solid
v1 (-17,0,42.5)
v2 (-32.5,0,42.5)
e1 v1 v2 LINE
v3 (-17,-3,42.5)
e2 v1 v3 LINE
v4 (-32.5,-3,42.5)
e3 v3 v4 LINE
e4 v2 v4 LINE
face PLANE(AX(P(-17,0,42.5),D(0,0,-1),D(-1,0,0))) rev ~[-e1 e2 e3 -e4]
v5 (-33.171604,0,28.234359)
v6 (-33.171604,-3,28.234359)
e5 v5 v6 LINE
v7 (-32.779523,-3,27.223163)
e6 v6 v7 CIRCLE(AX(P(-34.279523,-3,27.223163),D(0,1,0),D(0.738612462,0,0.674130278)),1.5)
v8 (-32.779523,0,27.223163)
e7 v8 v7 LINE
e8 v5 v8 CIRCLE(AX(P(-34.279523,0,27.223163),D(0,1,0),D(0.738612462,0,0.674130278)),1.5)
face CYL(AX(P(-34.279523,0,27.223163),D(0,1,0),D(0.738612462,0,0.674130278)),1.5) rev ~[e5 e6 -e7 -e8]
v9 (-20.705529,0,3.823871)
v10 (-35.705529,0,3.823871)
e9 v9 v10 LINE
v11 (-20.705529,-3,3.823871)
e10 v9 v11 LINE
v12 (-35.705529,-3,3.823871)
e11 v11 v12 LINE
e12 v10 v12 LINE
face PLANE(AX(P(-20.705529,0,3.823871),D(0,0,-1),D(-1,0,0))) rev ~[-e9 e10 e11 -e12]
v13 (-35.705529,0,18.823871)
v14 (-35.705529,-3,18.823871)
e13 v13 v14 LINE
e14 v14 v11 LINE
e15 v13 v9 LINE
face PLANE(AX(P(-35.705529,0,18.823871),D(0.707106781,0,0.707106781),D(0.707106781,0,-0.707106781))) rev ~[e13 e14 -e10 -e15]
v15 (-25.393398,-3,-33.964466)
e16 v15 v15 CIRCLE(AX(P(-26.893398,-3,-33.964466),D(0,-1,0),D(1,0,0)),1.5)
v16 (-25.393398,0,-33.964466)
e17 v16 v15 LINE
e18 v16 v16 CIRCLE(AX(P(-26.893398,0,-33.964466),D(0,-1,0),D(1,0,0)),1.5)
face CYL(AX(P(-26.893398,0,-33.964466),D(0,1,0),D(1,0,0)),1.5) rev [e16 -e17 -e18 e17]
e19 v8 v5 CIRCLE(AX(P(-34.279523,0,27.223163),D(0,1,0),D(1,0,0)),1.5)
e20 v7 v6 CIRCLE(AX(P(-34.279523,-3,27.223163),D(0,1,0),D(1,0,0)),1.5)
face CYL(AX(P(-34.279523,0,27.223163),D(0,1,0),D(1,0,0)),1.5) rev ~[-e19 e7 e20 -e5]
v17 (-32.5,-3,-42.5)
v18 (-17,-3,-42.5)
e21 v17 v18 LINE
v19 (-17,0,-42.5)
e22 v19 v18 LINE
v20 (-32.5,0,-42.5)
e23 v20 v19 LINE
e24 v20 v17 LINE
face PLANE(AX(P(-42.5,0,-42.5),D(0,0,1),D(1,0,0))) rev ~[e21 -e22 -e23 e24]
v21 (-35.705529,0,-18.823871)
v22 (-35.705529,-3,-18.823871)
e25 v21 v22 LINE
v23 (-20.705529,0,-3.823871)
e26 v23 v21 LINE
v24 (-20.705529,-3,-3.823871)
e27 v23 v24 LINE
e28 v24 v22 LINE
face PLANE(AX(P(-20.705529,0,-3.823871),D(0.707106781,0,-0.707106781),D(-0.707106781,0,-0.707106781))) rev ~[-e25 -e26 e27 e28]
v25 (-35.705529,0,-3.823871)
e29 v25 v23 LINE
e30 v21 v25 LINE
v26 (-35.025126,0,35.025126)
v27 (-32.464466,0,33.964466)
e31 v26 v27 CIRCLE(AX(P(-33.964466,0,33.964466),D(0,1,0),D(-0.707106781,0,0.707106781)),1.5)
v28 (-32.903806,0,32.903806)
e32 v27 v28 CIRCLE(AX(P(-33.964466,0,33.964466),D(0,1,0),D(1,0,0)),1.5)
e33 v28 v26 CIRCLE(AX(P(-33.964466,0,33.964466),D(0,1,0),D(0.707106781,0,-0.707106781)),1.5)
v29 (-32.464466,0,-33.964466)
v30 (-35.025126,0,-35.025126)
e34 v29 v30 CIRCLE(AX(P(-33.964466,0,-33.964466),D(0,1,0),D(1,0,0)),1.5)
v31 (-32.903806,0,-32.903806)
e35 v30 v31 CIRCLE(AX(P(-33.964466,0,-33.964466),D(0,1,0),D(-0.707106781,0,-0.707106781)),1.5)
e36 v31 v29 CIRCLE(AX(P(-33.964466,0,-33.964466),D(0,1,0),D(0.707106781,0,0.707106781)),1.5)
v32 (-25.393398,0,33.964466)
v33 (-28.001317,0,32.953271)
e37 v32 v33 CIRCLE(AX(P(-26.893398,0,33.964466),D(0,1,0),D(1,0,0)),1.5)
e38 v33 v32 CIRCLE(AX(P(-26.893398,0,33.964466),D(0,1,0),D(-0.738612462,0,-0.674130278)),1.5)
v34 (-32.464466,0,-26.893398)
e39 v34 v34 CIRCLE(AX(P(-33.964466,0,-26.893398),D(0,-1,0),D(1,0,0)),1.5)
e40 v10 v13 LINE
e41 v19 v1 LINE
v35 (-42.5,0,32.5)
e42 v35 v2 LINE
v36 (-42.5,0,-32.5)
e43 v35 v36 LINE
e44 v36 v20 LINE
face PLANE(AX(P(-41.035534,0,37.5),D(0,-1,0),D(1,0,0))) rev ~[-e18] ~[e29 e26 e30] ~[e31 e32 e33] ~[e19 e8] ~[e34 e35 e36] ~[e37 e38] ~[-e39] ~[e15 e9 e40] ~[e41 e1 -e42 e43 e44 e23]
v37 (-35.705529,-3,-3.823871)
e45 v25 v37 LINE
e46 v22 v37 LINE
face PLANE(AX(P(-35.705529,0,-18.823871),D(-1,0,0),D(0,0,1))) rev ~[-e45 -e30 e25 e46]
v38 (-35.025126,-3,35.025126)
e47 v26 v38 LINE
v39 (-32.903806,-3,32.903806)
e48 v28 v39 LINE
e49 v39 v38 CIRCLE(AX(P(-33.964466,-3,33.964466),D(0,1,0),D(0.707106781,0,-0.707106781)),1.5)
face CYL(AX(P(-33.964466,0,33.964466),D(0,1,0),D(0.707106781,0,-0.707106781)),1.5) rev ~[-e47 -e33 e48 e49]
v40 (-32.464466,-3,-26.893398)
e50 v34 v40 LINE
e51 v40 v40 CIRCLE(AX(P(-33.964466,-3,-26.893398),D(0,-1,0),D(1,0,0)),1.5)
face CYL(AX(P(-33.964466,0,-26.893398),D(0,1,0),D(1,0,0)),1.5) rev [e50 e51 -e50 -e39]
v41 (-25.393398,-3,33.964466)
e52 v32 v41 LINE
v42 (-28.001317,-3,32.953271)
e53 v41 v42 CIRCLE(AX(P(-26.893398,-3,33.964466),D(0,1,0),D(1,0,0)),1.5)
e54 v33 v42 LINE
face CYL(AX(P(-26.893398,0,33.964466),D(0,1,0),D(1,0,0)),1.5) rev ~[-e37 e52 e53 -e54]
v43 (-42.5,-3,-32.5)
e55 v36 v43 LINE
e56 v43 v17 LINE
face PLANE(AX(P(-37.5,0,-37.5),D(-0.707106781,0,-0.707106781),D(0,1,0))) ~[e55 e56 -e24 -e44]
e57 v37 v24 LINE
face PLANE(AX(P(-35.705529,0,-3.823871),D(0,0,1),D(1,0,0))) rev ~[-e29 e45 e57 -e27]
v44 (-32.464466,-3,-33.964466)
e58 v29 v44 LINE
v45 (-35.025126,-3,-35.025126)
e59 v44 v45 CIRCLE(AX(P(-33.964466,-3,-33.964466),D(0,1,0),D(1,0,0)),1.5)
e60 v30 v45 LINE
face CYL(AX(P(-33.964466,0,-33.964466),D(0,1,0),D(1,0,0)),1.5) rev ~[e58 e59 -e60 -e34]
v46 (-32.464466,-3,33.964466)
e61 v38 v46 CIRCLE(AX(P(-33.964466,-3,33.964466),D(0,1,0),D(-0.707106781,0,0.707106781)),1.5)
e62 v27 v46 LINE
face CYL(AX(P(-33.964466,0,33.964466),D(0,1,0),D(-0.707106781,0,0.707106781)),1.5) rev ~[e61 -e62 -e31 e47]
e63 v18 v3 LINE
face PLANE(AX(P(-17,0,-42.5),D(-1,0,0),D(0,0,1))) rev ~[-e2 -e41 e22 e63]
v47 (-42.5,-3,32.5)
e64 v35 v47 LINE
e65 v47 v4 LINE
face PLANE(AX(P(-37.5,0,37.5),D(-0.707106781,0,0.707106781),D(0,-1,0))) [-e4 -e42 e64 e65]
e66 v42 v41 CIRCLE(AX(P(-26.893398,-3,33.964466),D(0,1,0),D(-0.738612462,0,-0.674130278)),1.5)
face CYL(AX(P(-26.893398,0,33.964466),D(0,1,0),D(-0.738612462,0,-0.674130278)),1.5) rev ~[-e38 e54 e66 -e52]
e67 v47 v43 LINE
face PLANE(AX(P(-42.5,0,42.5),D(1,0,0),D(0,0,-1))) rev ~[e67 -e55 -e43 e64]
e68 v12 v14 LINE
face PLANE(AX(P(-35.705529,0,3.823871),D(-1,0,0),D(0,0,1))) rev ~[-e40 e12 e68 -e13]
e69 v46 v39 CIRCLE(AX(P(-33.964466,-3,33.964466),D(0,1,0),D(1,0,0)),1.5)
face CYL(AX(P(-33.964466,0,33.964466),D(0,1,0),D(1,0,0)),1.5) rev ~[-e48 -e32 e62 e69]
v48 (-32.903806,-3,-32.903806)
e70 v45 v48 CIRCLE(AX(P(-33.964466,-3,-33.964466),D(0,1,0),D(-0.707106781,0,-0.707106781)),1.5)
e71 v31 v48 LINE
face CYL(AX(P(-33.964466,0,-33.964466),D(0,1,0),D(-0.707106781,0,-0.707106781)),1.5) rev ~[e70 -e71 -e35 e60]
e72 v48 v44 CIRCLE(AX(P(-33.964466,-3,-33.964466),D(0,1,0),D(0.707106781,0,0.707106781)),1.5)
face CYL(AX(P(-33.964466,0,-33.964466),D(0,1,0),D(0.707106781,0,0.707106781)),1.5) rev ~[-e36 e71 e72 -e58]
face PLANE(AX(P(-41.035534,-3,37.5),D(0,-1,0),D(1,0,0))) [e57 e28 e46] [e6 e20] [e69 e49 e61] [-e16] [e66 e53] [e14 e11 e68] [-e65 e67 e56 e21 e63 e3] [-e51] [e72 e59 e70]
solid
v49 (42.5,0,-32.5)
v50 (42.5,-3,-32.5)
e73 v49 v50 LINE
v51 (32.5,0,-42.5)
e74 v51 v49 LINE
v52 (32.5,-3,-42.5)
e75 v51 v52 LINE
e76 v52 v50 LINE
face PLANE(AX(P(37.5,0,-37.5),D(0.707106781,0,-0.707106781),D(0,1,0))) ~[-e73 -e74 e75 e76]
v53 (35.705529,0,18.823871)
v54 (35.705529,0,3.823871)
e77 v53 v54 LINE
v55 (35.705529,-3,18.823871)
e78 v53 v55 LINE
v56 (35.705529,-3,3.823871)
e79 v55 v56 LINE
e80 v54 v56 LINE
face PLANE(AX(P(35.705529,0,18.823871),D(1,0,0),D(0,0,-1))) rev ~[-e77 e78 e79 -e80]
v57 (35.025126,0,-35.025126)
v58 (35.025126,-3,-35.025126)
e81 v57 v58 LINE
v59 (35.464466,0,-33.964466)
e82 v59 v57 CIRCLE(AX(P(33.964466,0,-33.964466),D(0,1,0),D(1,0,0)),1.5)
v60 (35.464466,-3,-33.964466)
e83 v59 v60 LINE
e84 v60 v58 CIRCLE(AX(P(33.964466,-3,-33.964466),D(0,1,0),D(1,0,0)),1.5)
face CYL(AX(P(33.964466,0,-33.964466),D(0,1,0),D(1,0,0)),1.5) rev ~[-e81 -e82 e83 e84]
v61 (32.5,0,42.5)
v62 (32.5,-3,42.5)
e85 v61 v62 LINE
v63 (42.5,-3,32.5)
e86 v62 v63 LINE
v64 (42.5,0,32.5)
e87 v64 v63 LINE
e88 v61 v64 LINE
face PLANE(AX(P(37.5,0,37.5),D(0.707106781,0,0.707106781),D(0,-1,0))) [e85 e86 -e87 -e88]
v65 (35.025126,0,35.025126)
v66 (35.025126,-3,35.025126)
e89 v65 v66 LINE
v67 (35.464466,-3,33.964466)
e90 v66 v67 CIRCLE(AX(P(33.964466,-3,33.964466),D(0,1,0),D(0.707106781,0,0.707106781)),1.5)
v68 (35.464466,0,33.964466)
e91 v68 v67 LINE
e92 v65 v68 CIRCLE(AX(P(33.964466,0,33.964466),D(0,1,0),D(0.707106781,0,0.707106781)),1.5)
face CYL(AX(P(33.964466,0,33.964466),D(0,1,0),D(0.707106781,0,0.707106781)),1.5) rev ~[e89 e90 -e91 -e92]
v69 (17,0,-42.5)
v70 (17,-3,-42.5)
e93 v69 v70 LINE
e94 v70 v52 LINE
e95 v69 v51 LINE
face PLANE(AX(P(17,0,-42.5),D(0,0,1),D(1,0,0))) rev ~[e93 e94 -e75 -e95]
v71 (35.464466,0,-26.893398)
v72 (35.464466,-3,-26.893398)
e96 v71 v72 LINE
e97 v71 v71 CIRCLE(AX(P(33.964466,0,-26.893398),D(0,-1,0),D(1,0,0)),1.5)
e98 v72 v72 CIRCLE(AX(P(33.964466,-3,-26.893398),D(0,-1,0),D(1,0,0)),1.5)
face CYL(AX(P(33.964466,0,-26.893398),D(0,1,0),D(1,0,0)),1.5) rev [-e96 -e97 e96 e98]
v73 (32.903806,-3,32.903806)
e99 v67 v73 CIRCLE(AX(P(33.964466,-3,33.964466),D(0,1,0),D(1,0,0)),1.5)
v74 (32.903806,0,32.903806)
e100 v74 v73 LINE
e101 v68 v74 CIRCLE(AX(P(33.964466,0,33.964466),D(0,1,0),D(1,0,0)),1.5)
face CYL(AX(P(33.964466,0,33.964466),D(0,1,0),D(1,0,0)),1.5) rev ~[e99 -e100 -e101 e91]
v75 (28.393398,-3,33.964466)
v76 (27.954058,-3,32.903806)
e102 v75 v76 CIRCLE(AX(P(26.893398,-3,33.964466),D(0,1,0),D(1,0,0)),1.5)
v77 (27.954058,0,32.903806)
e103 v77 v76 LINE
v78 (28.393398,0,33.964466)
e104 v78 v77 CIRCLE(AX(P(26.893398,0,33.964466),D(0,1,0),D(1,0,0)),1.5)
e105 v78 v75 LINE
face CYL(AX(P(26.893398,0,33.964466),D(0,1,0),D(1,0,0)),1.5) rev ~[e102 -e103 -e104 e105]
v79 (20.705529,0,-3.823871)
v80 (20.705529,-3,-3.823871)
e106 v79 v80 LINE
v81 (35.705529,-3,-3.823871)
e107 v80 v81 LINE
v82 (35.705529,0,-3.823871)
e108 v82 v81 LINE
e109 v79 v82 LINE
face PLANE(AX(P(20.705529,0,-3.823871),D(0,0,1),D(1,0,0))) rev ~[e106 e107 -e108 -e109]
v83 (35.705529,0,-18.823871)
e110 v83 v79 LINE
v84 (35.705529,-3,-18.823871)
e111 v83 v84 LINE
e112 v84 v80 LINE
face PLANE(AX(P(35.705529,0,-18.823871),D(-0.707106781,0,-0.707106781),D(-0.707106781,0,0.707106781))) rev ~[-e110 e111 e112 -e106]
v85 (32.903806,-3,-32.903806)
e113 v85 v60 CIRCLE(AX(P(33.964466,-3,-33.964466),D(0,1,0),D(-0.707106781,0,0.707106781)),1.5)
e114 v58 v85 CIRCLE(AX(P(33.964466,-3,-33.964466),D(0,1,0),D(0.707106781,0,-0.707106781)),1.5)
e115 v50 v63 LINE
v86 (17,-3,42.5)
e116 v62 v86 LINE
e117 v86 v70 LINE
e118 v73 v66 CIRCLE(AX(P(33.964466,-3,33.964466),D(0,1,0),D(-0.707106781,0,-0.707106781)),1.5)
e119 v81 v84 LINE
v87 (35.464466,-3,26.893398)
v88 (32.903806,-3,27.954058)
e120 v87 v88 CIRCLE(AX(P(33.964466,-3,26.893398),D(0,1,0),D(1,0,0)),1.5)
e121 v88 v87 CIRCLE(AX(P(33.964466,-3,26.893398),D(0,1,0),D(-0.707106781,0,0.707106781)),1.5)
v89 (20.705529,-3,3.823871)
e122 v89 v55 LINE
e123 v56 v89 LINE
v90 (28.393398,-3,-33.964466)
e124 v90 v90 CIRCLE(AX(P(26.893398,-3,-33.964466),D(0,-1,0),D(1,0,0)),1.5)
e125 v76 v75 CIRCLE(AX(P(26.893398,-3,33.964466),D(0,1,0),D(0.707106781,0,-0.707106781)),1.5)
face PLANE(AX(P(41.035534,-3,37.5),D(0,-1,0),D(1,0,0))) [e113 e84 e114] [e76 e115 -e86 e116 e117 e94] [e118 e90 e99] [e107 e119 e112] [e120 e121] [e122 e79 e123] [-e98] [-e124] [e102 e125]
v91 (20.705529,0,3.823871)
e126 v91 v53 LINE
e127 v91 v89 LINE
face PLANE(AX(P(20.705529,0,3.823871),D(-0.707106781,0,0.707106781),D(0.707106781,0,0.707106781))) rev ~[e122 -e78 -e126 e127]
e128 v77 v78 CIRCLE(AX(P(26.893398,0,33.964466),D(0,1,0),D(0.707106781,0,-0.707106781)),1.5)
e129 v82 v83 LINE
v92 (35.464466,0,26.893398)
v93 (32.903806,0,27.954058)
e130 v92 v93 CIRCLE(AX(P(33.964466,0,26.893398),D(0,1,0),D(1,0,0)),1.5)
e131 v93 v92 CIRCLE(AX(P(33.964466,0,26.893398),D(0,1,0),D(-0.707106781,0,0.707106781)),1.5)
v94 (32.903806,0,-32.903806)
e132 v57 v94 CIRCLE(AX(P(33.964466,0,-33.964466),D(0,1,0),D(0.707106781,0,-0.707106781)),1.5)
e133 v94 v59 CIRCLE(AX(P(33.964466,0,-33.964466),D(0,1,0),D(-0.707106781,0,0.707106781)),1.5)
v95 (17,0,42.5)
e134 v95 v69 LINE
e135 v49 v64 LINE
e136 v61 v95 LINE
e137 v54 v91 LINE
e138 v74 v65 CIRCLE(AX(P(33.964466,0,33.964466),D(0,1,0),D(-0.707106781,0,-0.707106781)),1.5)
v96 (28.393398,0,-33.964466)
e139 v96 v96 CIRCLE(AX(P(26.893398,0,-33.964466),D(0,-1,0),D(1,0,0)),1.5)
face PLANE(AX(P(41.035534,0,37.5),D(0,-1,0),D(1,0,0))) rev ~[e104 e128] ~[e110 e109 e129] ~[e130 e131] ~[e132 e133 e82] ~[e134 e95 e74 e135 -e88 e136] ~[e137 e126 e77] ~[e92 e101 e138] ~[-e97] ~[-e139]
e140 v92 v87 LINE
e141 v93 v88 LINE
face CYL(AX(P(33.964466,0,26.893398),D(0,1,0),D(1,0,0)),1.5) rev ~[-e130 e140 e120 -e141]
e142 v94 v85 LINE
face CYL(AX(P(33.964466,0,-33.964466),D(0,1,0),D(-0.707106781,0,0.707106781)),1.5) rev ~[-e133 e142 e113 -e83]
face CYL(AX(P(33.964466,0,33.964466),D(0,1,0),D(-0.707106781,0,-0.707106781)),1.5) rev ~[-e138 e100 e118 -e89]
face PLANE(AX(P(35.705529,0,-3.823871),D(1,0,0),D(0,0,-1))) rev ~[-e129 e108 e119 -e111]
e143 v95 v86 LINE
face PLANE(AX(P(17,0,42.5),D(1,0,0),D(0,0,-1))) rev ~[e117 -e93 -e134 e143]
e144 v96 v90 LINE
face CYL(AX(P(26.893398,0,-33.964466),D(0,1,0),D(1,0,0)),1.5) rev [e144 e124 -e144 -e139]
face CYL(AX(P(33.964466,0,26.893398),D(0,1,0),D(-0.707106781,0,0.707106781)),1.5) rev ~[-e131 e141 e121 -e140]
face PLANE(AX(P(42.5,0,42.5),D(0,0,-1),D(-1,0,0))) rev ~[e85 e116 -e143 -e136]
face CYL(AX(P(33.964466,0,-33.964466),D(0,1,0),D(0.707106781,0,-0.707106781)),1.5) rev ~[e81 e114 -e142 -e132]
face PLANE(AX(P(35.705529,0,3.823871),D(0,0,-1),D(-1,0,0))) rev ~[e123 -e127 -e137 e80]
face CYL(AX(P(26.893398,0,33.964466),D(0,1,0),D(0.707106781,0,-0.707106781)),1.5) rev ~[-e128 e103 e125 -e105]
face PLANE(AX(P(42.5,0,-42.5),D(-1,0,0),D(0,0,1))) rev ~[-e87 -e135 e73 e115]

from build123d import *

# Parameters (mm, degrees)
F0_R      = 1.5
F1_DEPTH  = 3
F2_SIZE   = 10
F2_2_SIZE = 10


with BuildPart() as f1:
    # F0 (on Front) → F1 (new body)
    with BuildSketch(Plane.XZ):
        Polygon((42.5, 32.5), (42.5, 42.5), (37.5, 37.5), align=None)
        Polygon((37.5, 37.5), (42.5, 42.5), (32.5, 42.5), align=None)
        Polygon((42.5, -32.5), (42.5, 32.5), (37.5, 37.5), (32.5, 42.5), (17, 42.5), (17, -42.5), (32.5, -42.5), (37.5, -37.5), align=None)
        with Locations((26.8933982822, -33.9644660941)):
            Circle(F0_R, mode=Mode.SUBTRACT)
        with BuildLine():
            ThreePointArc((35.4644660941, -33.9644660941), (35.3502853928, -34.5384912426), (35.0251262658, -35.0251262658))
            ThreePointArc((35.0251262658, -35.0251262658), (32.9038059223, -35.0251262658), (32.9038059223, -32.9038059223))
            ThreePointArc((32.9038059223, -32.9038059223), (34.5384912426, -32.5786467953), (35.4644660941, -33.9644660941))
        make_face(mode=Mode.SUBTRACT)
        with Locations((33.9644660941, -26.8933982822)):
            Circle(F0_R, mode=Mode.SUBTRACT)
        Polygon((20.7055291533, -3.823871389), (35.7055291533, -3.823871389), (35.7055291533, -18.823871389), align=None, mode=Mode.SUBTRACT)
        Polygon((35.7055291533, 3.823871389), (20.7055291533, 3.823871389), (35.7055291533, 18.823871389), align=None, mode=Mode.SUBTRACT)
        with BuildLine():
            ThreePointArc((35.4644660941, 26.8933982822), (33.3904409455, 25.5075789834), (32.9038059223, 27.954058454))
            ThreePointArc((32.9038059223, 27.954058454), (34.5384912426, 28.279217581), (35.4644660941, 26.8933982822))
        make_face(mode=Mode.SUBTRACT)
        with BuildLine():
            ThreePointArc((28.3933982822, 33.9644660941), (28.279217581, 33.3904409455), (27.954058454, 32.9038059223))
            ThreePointArc((27.954058454, 32.9038059223), (25.5075789834, 34.5384912426), (28.3933982822, 33.9644660941))
        make_face(mode=Mode.SUBTRACT)
        with BuildLine():
            ThreePointArc((32.9038059223, 32.9038059223), (32.9038059223, 35.0251262658), (35.0251262658, 35.0251262658))
            ThreePointArc((35.0251262658, 35.0251262658), (35.3502853928, 34.5384912426), (35.4644660941, 33.9644660941))
            ThreePointArc((35.4644660941, 33.9644660941), (34.5384912426, 32.5786467953), (32.9038059223, 32.9038059223))
        make_face(mode=Mode.SUBTRACT)
        Polygon((42.5, -42.5), (42.5, -32.5), (37.5, -37.5), align=None)
        Polygon((32.5, -42.5), (42.5, -42.5), (37.5, -37.5), align=None)
    extrude(amount=F1_DEPTH)

    # F2
    f2_edges = [f1.edges().sort_by_distance(p)[0] for p in [
        (42.5, -1.5, 42.5),
        (42.5, -1.5, -42.5),
    ]]
    chamfer(f2_edges, length=F2_SIZE)


with BuildPart() as f1b:
    # F0 (on Front) → F1, piece 2 (new body)
    with BuildSketch(Plane.XZ):
        Polygon((-37.5, 37.5), (-42.5, 42.5), (-42.5, 32.5), align=None)
        Polygon((-32.5, 42.5), (-42.5, 42.5), (-37.5, 37.5), align=None)
        Polygon((-37.5, 37.5), (-42.5, 32.5), (-42.5, -32.5), (-37.5, -37.5), (-32.5, -42.5), (-17, -42.5), (-17, 42.5), (-32.5, 42.5), align=None)
        with BuildLine():
            ThreePointArc((-32.4644660941, -33.9644660941), (-33.3904409455, -35.3502853928), (-35.0251262658, -35.0251262658))
            ThreePointArc((-35.0251262658, -35.0251262658), (-35.0251262658, -32.9038059223), (-32.9038059223, -32.9038059223))
            ThreePointArc((-32.9038059223, -32.9038059223), (-32.5786467953, -33.3904409455), (-32.4644660941, -33.9644660941))
        make_face(mode=Mode.SUBTRACT)
        with Locations((-26.8933982822, -33.9644660941)):
            Circle(F0_R, mode=Mode.SUBTRACT)
        with Locations((-33.9644660941, -26.8933982822)):
            Circle(F0_R, mode=Mode.SUBTRACT)
        Polygon((-20.7055291533, -3.823871389), (-35.7055291533, -18.823871389), (-35.7055291533, -3.823871389), align=None, mode=Mode.SUBTRACT)
        Polygon((-35.7055291533, 3.823871389), (-35.7055291533, 18.823871389), (-20.7055291533, 3.823871389), align=None, mode=Mode.SUBTRACT)
        with BuildLine():
            ThreePointArc((-32.7795228992, 27.2231633162), (-35.6780717969, 26.6808894181), (-33.1716042066, 28.2343587329))
            ThreePointArc((-33.1716042066, 28.2343587329), (-32.8809740014, 27.7654372144), (-32.7795228992, 27.2231633162))
        make_face(mode=Mode.SUBTRACT)
        with BuildLine():
            ThreePointArc((-32.9038059223, 32.9038059223), (-35.0251262658, 32.9038059223), (-35.0251262658, 35.0251262658))
            ThreePointArc((-35.0251262658, 35.0251262658), (-33.3904409455, 35.3502853928), (-32.4644660941, 33.9644660941))
            ThreePointArc((-32.4644660941, 33.9644660941), (-32.5786467953, 33.3904409455), (-32.9038059223, 32.9038059223))
        make_face(mode=Mode.SUBTRACT)
        with BuildLine():
            ThreePointArc((-25.3933982822, 33.9644660941), (-26.3511243841, 32.5659171963), (-28.0013169747, 32.9532706774))
            ThreePointArc((-28.0013169747, 32.9532706774), (-27.4356721803, 35.3630149918), (-25.3933982822, 33.9644660941))
        make_face(mode=Mode.SUBTRACT)
        Polygon((-37.5, -37.5), (-42.5, -32.5), (-42.5, -42.5), align=None)
        Polygon((-37.5, -37.5), (-42.5, -42.5), (-32.5, -42.5), align=None)
    extrude(amount=F1_DEPTH)

    # F2#2
    f2_2_edges = [f1b.edges().sort_by_distance(p)[0] for p in [
        (-42.5, -1.5, 42.5),
        (-42.5, -1.5, -42.5),
    ]]
    chamfer(f2_2_edges, length=F2_2_SIZE)


solid = Compound([f1.part, f1b.part])
